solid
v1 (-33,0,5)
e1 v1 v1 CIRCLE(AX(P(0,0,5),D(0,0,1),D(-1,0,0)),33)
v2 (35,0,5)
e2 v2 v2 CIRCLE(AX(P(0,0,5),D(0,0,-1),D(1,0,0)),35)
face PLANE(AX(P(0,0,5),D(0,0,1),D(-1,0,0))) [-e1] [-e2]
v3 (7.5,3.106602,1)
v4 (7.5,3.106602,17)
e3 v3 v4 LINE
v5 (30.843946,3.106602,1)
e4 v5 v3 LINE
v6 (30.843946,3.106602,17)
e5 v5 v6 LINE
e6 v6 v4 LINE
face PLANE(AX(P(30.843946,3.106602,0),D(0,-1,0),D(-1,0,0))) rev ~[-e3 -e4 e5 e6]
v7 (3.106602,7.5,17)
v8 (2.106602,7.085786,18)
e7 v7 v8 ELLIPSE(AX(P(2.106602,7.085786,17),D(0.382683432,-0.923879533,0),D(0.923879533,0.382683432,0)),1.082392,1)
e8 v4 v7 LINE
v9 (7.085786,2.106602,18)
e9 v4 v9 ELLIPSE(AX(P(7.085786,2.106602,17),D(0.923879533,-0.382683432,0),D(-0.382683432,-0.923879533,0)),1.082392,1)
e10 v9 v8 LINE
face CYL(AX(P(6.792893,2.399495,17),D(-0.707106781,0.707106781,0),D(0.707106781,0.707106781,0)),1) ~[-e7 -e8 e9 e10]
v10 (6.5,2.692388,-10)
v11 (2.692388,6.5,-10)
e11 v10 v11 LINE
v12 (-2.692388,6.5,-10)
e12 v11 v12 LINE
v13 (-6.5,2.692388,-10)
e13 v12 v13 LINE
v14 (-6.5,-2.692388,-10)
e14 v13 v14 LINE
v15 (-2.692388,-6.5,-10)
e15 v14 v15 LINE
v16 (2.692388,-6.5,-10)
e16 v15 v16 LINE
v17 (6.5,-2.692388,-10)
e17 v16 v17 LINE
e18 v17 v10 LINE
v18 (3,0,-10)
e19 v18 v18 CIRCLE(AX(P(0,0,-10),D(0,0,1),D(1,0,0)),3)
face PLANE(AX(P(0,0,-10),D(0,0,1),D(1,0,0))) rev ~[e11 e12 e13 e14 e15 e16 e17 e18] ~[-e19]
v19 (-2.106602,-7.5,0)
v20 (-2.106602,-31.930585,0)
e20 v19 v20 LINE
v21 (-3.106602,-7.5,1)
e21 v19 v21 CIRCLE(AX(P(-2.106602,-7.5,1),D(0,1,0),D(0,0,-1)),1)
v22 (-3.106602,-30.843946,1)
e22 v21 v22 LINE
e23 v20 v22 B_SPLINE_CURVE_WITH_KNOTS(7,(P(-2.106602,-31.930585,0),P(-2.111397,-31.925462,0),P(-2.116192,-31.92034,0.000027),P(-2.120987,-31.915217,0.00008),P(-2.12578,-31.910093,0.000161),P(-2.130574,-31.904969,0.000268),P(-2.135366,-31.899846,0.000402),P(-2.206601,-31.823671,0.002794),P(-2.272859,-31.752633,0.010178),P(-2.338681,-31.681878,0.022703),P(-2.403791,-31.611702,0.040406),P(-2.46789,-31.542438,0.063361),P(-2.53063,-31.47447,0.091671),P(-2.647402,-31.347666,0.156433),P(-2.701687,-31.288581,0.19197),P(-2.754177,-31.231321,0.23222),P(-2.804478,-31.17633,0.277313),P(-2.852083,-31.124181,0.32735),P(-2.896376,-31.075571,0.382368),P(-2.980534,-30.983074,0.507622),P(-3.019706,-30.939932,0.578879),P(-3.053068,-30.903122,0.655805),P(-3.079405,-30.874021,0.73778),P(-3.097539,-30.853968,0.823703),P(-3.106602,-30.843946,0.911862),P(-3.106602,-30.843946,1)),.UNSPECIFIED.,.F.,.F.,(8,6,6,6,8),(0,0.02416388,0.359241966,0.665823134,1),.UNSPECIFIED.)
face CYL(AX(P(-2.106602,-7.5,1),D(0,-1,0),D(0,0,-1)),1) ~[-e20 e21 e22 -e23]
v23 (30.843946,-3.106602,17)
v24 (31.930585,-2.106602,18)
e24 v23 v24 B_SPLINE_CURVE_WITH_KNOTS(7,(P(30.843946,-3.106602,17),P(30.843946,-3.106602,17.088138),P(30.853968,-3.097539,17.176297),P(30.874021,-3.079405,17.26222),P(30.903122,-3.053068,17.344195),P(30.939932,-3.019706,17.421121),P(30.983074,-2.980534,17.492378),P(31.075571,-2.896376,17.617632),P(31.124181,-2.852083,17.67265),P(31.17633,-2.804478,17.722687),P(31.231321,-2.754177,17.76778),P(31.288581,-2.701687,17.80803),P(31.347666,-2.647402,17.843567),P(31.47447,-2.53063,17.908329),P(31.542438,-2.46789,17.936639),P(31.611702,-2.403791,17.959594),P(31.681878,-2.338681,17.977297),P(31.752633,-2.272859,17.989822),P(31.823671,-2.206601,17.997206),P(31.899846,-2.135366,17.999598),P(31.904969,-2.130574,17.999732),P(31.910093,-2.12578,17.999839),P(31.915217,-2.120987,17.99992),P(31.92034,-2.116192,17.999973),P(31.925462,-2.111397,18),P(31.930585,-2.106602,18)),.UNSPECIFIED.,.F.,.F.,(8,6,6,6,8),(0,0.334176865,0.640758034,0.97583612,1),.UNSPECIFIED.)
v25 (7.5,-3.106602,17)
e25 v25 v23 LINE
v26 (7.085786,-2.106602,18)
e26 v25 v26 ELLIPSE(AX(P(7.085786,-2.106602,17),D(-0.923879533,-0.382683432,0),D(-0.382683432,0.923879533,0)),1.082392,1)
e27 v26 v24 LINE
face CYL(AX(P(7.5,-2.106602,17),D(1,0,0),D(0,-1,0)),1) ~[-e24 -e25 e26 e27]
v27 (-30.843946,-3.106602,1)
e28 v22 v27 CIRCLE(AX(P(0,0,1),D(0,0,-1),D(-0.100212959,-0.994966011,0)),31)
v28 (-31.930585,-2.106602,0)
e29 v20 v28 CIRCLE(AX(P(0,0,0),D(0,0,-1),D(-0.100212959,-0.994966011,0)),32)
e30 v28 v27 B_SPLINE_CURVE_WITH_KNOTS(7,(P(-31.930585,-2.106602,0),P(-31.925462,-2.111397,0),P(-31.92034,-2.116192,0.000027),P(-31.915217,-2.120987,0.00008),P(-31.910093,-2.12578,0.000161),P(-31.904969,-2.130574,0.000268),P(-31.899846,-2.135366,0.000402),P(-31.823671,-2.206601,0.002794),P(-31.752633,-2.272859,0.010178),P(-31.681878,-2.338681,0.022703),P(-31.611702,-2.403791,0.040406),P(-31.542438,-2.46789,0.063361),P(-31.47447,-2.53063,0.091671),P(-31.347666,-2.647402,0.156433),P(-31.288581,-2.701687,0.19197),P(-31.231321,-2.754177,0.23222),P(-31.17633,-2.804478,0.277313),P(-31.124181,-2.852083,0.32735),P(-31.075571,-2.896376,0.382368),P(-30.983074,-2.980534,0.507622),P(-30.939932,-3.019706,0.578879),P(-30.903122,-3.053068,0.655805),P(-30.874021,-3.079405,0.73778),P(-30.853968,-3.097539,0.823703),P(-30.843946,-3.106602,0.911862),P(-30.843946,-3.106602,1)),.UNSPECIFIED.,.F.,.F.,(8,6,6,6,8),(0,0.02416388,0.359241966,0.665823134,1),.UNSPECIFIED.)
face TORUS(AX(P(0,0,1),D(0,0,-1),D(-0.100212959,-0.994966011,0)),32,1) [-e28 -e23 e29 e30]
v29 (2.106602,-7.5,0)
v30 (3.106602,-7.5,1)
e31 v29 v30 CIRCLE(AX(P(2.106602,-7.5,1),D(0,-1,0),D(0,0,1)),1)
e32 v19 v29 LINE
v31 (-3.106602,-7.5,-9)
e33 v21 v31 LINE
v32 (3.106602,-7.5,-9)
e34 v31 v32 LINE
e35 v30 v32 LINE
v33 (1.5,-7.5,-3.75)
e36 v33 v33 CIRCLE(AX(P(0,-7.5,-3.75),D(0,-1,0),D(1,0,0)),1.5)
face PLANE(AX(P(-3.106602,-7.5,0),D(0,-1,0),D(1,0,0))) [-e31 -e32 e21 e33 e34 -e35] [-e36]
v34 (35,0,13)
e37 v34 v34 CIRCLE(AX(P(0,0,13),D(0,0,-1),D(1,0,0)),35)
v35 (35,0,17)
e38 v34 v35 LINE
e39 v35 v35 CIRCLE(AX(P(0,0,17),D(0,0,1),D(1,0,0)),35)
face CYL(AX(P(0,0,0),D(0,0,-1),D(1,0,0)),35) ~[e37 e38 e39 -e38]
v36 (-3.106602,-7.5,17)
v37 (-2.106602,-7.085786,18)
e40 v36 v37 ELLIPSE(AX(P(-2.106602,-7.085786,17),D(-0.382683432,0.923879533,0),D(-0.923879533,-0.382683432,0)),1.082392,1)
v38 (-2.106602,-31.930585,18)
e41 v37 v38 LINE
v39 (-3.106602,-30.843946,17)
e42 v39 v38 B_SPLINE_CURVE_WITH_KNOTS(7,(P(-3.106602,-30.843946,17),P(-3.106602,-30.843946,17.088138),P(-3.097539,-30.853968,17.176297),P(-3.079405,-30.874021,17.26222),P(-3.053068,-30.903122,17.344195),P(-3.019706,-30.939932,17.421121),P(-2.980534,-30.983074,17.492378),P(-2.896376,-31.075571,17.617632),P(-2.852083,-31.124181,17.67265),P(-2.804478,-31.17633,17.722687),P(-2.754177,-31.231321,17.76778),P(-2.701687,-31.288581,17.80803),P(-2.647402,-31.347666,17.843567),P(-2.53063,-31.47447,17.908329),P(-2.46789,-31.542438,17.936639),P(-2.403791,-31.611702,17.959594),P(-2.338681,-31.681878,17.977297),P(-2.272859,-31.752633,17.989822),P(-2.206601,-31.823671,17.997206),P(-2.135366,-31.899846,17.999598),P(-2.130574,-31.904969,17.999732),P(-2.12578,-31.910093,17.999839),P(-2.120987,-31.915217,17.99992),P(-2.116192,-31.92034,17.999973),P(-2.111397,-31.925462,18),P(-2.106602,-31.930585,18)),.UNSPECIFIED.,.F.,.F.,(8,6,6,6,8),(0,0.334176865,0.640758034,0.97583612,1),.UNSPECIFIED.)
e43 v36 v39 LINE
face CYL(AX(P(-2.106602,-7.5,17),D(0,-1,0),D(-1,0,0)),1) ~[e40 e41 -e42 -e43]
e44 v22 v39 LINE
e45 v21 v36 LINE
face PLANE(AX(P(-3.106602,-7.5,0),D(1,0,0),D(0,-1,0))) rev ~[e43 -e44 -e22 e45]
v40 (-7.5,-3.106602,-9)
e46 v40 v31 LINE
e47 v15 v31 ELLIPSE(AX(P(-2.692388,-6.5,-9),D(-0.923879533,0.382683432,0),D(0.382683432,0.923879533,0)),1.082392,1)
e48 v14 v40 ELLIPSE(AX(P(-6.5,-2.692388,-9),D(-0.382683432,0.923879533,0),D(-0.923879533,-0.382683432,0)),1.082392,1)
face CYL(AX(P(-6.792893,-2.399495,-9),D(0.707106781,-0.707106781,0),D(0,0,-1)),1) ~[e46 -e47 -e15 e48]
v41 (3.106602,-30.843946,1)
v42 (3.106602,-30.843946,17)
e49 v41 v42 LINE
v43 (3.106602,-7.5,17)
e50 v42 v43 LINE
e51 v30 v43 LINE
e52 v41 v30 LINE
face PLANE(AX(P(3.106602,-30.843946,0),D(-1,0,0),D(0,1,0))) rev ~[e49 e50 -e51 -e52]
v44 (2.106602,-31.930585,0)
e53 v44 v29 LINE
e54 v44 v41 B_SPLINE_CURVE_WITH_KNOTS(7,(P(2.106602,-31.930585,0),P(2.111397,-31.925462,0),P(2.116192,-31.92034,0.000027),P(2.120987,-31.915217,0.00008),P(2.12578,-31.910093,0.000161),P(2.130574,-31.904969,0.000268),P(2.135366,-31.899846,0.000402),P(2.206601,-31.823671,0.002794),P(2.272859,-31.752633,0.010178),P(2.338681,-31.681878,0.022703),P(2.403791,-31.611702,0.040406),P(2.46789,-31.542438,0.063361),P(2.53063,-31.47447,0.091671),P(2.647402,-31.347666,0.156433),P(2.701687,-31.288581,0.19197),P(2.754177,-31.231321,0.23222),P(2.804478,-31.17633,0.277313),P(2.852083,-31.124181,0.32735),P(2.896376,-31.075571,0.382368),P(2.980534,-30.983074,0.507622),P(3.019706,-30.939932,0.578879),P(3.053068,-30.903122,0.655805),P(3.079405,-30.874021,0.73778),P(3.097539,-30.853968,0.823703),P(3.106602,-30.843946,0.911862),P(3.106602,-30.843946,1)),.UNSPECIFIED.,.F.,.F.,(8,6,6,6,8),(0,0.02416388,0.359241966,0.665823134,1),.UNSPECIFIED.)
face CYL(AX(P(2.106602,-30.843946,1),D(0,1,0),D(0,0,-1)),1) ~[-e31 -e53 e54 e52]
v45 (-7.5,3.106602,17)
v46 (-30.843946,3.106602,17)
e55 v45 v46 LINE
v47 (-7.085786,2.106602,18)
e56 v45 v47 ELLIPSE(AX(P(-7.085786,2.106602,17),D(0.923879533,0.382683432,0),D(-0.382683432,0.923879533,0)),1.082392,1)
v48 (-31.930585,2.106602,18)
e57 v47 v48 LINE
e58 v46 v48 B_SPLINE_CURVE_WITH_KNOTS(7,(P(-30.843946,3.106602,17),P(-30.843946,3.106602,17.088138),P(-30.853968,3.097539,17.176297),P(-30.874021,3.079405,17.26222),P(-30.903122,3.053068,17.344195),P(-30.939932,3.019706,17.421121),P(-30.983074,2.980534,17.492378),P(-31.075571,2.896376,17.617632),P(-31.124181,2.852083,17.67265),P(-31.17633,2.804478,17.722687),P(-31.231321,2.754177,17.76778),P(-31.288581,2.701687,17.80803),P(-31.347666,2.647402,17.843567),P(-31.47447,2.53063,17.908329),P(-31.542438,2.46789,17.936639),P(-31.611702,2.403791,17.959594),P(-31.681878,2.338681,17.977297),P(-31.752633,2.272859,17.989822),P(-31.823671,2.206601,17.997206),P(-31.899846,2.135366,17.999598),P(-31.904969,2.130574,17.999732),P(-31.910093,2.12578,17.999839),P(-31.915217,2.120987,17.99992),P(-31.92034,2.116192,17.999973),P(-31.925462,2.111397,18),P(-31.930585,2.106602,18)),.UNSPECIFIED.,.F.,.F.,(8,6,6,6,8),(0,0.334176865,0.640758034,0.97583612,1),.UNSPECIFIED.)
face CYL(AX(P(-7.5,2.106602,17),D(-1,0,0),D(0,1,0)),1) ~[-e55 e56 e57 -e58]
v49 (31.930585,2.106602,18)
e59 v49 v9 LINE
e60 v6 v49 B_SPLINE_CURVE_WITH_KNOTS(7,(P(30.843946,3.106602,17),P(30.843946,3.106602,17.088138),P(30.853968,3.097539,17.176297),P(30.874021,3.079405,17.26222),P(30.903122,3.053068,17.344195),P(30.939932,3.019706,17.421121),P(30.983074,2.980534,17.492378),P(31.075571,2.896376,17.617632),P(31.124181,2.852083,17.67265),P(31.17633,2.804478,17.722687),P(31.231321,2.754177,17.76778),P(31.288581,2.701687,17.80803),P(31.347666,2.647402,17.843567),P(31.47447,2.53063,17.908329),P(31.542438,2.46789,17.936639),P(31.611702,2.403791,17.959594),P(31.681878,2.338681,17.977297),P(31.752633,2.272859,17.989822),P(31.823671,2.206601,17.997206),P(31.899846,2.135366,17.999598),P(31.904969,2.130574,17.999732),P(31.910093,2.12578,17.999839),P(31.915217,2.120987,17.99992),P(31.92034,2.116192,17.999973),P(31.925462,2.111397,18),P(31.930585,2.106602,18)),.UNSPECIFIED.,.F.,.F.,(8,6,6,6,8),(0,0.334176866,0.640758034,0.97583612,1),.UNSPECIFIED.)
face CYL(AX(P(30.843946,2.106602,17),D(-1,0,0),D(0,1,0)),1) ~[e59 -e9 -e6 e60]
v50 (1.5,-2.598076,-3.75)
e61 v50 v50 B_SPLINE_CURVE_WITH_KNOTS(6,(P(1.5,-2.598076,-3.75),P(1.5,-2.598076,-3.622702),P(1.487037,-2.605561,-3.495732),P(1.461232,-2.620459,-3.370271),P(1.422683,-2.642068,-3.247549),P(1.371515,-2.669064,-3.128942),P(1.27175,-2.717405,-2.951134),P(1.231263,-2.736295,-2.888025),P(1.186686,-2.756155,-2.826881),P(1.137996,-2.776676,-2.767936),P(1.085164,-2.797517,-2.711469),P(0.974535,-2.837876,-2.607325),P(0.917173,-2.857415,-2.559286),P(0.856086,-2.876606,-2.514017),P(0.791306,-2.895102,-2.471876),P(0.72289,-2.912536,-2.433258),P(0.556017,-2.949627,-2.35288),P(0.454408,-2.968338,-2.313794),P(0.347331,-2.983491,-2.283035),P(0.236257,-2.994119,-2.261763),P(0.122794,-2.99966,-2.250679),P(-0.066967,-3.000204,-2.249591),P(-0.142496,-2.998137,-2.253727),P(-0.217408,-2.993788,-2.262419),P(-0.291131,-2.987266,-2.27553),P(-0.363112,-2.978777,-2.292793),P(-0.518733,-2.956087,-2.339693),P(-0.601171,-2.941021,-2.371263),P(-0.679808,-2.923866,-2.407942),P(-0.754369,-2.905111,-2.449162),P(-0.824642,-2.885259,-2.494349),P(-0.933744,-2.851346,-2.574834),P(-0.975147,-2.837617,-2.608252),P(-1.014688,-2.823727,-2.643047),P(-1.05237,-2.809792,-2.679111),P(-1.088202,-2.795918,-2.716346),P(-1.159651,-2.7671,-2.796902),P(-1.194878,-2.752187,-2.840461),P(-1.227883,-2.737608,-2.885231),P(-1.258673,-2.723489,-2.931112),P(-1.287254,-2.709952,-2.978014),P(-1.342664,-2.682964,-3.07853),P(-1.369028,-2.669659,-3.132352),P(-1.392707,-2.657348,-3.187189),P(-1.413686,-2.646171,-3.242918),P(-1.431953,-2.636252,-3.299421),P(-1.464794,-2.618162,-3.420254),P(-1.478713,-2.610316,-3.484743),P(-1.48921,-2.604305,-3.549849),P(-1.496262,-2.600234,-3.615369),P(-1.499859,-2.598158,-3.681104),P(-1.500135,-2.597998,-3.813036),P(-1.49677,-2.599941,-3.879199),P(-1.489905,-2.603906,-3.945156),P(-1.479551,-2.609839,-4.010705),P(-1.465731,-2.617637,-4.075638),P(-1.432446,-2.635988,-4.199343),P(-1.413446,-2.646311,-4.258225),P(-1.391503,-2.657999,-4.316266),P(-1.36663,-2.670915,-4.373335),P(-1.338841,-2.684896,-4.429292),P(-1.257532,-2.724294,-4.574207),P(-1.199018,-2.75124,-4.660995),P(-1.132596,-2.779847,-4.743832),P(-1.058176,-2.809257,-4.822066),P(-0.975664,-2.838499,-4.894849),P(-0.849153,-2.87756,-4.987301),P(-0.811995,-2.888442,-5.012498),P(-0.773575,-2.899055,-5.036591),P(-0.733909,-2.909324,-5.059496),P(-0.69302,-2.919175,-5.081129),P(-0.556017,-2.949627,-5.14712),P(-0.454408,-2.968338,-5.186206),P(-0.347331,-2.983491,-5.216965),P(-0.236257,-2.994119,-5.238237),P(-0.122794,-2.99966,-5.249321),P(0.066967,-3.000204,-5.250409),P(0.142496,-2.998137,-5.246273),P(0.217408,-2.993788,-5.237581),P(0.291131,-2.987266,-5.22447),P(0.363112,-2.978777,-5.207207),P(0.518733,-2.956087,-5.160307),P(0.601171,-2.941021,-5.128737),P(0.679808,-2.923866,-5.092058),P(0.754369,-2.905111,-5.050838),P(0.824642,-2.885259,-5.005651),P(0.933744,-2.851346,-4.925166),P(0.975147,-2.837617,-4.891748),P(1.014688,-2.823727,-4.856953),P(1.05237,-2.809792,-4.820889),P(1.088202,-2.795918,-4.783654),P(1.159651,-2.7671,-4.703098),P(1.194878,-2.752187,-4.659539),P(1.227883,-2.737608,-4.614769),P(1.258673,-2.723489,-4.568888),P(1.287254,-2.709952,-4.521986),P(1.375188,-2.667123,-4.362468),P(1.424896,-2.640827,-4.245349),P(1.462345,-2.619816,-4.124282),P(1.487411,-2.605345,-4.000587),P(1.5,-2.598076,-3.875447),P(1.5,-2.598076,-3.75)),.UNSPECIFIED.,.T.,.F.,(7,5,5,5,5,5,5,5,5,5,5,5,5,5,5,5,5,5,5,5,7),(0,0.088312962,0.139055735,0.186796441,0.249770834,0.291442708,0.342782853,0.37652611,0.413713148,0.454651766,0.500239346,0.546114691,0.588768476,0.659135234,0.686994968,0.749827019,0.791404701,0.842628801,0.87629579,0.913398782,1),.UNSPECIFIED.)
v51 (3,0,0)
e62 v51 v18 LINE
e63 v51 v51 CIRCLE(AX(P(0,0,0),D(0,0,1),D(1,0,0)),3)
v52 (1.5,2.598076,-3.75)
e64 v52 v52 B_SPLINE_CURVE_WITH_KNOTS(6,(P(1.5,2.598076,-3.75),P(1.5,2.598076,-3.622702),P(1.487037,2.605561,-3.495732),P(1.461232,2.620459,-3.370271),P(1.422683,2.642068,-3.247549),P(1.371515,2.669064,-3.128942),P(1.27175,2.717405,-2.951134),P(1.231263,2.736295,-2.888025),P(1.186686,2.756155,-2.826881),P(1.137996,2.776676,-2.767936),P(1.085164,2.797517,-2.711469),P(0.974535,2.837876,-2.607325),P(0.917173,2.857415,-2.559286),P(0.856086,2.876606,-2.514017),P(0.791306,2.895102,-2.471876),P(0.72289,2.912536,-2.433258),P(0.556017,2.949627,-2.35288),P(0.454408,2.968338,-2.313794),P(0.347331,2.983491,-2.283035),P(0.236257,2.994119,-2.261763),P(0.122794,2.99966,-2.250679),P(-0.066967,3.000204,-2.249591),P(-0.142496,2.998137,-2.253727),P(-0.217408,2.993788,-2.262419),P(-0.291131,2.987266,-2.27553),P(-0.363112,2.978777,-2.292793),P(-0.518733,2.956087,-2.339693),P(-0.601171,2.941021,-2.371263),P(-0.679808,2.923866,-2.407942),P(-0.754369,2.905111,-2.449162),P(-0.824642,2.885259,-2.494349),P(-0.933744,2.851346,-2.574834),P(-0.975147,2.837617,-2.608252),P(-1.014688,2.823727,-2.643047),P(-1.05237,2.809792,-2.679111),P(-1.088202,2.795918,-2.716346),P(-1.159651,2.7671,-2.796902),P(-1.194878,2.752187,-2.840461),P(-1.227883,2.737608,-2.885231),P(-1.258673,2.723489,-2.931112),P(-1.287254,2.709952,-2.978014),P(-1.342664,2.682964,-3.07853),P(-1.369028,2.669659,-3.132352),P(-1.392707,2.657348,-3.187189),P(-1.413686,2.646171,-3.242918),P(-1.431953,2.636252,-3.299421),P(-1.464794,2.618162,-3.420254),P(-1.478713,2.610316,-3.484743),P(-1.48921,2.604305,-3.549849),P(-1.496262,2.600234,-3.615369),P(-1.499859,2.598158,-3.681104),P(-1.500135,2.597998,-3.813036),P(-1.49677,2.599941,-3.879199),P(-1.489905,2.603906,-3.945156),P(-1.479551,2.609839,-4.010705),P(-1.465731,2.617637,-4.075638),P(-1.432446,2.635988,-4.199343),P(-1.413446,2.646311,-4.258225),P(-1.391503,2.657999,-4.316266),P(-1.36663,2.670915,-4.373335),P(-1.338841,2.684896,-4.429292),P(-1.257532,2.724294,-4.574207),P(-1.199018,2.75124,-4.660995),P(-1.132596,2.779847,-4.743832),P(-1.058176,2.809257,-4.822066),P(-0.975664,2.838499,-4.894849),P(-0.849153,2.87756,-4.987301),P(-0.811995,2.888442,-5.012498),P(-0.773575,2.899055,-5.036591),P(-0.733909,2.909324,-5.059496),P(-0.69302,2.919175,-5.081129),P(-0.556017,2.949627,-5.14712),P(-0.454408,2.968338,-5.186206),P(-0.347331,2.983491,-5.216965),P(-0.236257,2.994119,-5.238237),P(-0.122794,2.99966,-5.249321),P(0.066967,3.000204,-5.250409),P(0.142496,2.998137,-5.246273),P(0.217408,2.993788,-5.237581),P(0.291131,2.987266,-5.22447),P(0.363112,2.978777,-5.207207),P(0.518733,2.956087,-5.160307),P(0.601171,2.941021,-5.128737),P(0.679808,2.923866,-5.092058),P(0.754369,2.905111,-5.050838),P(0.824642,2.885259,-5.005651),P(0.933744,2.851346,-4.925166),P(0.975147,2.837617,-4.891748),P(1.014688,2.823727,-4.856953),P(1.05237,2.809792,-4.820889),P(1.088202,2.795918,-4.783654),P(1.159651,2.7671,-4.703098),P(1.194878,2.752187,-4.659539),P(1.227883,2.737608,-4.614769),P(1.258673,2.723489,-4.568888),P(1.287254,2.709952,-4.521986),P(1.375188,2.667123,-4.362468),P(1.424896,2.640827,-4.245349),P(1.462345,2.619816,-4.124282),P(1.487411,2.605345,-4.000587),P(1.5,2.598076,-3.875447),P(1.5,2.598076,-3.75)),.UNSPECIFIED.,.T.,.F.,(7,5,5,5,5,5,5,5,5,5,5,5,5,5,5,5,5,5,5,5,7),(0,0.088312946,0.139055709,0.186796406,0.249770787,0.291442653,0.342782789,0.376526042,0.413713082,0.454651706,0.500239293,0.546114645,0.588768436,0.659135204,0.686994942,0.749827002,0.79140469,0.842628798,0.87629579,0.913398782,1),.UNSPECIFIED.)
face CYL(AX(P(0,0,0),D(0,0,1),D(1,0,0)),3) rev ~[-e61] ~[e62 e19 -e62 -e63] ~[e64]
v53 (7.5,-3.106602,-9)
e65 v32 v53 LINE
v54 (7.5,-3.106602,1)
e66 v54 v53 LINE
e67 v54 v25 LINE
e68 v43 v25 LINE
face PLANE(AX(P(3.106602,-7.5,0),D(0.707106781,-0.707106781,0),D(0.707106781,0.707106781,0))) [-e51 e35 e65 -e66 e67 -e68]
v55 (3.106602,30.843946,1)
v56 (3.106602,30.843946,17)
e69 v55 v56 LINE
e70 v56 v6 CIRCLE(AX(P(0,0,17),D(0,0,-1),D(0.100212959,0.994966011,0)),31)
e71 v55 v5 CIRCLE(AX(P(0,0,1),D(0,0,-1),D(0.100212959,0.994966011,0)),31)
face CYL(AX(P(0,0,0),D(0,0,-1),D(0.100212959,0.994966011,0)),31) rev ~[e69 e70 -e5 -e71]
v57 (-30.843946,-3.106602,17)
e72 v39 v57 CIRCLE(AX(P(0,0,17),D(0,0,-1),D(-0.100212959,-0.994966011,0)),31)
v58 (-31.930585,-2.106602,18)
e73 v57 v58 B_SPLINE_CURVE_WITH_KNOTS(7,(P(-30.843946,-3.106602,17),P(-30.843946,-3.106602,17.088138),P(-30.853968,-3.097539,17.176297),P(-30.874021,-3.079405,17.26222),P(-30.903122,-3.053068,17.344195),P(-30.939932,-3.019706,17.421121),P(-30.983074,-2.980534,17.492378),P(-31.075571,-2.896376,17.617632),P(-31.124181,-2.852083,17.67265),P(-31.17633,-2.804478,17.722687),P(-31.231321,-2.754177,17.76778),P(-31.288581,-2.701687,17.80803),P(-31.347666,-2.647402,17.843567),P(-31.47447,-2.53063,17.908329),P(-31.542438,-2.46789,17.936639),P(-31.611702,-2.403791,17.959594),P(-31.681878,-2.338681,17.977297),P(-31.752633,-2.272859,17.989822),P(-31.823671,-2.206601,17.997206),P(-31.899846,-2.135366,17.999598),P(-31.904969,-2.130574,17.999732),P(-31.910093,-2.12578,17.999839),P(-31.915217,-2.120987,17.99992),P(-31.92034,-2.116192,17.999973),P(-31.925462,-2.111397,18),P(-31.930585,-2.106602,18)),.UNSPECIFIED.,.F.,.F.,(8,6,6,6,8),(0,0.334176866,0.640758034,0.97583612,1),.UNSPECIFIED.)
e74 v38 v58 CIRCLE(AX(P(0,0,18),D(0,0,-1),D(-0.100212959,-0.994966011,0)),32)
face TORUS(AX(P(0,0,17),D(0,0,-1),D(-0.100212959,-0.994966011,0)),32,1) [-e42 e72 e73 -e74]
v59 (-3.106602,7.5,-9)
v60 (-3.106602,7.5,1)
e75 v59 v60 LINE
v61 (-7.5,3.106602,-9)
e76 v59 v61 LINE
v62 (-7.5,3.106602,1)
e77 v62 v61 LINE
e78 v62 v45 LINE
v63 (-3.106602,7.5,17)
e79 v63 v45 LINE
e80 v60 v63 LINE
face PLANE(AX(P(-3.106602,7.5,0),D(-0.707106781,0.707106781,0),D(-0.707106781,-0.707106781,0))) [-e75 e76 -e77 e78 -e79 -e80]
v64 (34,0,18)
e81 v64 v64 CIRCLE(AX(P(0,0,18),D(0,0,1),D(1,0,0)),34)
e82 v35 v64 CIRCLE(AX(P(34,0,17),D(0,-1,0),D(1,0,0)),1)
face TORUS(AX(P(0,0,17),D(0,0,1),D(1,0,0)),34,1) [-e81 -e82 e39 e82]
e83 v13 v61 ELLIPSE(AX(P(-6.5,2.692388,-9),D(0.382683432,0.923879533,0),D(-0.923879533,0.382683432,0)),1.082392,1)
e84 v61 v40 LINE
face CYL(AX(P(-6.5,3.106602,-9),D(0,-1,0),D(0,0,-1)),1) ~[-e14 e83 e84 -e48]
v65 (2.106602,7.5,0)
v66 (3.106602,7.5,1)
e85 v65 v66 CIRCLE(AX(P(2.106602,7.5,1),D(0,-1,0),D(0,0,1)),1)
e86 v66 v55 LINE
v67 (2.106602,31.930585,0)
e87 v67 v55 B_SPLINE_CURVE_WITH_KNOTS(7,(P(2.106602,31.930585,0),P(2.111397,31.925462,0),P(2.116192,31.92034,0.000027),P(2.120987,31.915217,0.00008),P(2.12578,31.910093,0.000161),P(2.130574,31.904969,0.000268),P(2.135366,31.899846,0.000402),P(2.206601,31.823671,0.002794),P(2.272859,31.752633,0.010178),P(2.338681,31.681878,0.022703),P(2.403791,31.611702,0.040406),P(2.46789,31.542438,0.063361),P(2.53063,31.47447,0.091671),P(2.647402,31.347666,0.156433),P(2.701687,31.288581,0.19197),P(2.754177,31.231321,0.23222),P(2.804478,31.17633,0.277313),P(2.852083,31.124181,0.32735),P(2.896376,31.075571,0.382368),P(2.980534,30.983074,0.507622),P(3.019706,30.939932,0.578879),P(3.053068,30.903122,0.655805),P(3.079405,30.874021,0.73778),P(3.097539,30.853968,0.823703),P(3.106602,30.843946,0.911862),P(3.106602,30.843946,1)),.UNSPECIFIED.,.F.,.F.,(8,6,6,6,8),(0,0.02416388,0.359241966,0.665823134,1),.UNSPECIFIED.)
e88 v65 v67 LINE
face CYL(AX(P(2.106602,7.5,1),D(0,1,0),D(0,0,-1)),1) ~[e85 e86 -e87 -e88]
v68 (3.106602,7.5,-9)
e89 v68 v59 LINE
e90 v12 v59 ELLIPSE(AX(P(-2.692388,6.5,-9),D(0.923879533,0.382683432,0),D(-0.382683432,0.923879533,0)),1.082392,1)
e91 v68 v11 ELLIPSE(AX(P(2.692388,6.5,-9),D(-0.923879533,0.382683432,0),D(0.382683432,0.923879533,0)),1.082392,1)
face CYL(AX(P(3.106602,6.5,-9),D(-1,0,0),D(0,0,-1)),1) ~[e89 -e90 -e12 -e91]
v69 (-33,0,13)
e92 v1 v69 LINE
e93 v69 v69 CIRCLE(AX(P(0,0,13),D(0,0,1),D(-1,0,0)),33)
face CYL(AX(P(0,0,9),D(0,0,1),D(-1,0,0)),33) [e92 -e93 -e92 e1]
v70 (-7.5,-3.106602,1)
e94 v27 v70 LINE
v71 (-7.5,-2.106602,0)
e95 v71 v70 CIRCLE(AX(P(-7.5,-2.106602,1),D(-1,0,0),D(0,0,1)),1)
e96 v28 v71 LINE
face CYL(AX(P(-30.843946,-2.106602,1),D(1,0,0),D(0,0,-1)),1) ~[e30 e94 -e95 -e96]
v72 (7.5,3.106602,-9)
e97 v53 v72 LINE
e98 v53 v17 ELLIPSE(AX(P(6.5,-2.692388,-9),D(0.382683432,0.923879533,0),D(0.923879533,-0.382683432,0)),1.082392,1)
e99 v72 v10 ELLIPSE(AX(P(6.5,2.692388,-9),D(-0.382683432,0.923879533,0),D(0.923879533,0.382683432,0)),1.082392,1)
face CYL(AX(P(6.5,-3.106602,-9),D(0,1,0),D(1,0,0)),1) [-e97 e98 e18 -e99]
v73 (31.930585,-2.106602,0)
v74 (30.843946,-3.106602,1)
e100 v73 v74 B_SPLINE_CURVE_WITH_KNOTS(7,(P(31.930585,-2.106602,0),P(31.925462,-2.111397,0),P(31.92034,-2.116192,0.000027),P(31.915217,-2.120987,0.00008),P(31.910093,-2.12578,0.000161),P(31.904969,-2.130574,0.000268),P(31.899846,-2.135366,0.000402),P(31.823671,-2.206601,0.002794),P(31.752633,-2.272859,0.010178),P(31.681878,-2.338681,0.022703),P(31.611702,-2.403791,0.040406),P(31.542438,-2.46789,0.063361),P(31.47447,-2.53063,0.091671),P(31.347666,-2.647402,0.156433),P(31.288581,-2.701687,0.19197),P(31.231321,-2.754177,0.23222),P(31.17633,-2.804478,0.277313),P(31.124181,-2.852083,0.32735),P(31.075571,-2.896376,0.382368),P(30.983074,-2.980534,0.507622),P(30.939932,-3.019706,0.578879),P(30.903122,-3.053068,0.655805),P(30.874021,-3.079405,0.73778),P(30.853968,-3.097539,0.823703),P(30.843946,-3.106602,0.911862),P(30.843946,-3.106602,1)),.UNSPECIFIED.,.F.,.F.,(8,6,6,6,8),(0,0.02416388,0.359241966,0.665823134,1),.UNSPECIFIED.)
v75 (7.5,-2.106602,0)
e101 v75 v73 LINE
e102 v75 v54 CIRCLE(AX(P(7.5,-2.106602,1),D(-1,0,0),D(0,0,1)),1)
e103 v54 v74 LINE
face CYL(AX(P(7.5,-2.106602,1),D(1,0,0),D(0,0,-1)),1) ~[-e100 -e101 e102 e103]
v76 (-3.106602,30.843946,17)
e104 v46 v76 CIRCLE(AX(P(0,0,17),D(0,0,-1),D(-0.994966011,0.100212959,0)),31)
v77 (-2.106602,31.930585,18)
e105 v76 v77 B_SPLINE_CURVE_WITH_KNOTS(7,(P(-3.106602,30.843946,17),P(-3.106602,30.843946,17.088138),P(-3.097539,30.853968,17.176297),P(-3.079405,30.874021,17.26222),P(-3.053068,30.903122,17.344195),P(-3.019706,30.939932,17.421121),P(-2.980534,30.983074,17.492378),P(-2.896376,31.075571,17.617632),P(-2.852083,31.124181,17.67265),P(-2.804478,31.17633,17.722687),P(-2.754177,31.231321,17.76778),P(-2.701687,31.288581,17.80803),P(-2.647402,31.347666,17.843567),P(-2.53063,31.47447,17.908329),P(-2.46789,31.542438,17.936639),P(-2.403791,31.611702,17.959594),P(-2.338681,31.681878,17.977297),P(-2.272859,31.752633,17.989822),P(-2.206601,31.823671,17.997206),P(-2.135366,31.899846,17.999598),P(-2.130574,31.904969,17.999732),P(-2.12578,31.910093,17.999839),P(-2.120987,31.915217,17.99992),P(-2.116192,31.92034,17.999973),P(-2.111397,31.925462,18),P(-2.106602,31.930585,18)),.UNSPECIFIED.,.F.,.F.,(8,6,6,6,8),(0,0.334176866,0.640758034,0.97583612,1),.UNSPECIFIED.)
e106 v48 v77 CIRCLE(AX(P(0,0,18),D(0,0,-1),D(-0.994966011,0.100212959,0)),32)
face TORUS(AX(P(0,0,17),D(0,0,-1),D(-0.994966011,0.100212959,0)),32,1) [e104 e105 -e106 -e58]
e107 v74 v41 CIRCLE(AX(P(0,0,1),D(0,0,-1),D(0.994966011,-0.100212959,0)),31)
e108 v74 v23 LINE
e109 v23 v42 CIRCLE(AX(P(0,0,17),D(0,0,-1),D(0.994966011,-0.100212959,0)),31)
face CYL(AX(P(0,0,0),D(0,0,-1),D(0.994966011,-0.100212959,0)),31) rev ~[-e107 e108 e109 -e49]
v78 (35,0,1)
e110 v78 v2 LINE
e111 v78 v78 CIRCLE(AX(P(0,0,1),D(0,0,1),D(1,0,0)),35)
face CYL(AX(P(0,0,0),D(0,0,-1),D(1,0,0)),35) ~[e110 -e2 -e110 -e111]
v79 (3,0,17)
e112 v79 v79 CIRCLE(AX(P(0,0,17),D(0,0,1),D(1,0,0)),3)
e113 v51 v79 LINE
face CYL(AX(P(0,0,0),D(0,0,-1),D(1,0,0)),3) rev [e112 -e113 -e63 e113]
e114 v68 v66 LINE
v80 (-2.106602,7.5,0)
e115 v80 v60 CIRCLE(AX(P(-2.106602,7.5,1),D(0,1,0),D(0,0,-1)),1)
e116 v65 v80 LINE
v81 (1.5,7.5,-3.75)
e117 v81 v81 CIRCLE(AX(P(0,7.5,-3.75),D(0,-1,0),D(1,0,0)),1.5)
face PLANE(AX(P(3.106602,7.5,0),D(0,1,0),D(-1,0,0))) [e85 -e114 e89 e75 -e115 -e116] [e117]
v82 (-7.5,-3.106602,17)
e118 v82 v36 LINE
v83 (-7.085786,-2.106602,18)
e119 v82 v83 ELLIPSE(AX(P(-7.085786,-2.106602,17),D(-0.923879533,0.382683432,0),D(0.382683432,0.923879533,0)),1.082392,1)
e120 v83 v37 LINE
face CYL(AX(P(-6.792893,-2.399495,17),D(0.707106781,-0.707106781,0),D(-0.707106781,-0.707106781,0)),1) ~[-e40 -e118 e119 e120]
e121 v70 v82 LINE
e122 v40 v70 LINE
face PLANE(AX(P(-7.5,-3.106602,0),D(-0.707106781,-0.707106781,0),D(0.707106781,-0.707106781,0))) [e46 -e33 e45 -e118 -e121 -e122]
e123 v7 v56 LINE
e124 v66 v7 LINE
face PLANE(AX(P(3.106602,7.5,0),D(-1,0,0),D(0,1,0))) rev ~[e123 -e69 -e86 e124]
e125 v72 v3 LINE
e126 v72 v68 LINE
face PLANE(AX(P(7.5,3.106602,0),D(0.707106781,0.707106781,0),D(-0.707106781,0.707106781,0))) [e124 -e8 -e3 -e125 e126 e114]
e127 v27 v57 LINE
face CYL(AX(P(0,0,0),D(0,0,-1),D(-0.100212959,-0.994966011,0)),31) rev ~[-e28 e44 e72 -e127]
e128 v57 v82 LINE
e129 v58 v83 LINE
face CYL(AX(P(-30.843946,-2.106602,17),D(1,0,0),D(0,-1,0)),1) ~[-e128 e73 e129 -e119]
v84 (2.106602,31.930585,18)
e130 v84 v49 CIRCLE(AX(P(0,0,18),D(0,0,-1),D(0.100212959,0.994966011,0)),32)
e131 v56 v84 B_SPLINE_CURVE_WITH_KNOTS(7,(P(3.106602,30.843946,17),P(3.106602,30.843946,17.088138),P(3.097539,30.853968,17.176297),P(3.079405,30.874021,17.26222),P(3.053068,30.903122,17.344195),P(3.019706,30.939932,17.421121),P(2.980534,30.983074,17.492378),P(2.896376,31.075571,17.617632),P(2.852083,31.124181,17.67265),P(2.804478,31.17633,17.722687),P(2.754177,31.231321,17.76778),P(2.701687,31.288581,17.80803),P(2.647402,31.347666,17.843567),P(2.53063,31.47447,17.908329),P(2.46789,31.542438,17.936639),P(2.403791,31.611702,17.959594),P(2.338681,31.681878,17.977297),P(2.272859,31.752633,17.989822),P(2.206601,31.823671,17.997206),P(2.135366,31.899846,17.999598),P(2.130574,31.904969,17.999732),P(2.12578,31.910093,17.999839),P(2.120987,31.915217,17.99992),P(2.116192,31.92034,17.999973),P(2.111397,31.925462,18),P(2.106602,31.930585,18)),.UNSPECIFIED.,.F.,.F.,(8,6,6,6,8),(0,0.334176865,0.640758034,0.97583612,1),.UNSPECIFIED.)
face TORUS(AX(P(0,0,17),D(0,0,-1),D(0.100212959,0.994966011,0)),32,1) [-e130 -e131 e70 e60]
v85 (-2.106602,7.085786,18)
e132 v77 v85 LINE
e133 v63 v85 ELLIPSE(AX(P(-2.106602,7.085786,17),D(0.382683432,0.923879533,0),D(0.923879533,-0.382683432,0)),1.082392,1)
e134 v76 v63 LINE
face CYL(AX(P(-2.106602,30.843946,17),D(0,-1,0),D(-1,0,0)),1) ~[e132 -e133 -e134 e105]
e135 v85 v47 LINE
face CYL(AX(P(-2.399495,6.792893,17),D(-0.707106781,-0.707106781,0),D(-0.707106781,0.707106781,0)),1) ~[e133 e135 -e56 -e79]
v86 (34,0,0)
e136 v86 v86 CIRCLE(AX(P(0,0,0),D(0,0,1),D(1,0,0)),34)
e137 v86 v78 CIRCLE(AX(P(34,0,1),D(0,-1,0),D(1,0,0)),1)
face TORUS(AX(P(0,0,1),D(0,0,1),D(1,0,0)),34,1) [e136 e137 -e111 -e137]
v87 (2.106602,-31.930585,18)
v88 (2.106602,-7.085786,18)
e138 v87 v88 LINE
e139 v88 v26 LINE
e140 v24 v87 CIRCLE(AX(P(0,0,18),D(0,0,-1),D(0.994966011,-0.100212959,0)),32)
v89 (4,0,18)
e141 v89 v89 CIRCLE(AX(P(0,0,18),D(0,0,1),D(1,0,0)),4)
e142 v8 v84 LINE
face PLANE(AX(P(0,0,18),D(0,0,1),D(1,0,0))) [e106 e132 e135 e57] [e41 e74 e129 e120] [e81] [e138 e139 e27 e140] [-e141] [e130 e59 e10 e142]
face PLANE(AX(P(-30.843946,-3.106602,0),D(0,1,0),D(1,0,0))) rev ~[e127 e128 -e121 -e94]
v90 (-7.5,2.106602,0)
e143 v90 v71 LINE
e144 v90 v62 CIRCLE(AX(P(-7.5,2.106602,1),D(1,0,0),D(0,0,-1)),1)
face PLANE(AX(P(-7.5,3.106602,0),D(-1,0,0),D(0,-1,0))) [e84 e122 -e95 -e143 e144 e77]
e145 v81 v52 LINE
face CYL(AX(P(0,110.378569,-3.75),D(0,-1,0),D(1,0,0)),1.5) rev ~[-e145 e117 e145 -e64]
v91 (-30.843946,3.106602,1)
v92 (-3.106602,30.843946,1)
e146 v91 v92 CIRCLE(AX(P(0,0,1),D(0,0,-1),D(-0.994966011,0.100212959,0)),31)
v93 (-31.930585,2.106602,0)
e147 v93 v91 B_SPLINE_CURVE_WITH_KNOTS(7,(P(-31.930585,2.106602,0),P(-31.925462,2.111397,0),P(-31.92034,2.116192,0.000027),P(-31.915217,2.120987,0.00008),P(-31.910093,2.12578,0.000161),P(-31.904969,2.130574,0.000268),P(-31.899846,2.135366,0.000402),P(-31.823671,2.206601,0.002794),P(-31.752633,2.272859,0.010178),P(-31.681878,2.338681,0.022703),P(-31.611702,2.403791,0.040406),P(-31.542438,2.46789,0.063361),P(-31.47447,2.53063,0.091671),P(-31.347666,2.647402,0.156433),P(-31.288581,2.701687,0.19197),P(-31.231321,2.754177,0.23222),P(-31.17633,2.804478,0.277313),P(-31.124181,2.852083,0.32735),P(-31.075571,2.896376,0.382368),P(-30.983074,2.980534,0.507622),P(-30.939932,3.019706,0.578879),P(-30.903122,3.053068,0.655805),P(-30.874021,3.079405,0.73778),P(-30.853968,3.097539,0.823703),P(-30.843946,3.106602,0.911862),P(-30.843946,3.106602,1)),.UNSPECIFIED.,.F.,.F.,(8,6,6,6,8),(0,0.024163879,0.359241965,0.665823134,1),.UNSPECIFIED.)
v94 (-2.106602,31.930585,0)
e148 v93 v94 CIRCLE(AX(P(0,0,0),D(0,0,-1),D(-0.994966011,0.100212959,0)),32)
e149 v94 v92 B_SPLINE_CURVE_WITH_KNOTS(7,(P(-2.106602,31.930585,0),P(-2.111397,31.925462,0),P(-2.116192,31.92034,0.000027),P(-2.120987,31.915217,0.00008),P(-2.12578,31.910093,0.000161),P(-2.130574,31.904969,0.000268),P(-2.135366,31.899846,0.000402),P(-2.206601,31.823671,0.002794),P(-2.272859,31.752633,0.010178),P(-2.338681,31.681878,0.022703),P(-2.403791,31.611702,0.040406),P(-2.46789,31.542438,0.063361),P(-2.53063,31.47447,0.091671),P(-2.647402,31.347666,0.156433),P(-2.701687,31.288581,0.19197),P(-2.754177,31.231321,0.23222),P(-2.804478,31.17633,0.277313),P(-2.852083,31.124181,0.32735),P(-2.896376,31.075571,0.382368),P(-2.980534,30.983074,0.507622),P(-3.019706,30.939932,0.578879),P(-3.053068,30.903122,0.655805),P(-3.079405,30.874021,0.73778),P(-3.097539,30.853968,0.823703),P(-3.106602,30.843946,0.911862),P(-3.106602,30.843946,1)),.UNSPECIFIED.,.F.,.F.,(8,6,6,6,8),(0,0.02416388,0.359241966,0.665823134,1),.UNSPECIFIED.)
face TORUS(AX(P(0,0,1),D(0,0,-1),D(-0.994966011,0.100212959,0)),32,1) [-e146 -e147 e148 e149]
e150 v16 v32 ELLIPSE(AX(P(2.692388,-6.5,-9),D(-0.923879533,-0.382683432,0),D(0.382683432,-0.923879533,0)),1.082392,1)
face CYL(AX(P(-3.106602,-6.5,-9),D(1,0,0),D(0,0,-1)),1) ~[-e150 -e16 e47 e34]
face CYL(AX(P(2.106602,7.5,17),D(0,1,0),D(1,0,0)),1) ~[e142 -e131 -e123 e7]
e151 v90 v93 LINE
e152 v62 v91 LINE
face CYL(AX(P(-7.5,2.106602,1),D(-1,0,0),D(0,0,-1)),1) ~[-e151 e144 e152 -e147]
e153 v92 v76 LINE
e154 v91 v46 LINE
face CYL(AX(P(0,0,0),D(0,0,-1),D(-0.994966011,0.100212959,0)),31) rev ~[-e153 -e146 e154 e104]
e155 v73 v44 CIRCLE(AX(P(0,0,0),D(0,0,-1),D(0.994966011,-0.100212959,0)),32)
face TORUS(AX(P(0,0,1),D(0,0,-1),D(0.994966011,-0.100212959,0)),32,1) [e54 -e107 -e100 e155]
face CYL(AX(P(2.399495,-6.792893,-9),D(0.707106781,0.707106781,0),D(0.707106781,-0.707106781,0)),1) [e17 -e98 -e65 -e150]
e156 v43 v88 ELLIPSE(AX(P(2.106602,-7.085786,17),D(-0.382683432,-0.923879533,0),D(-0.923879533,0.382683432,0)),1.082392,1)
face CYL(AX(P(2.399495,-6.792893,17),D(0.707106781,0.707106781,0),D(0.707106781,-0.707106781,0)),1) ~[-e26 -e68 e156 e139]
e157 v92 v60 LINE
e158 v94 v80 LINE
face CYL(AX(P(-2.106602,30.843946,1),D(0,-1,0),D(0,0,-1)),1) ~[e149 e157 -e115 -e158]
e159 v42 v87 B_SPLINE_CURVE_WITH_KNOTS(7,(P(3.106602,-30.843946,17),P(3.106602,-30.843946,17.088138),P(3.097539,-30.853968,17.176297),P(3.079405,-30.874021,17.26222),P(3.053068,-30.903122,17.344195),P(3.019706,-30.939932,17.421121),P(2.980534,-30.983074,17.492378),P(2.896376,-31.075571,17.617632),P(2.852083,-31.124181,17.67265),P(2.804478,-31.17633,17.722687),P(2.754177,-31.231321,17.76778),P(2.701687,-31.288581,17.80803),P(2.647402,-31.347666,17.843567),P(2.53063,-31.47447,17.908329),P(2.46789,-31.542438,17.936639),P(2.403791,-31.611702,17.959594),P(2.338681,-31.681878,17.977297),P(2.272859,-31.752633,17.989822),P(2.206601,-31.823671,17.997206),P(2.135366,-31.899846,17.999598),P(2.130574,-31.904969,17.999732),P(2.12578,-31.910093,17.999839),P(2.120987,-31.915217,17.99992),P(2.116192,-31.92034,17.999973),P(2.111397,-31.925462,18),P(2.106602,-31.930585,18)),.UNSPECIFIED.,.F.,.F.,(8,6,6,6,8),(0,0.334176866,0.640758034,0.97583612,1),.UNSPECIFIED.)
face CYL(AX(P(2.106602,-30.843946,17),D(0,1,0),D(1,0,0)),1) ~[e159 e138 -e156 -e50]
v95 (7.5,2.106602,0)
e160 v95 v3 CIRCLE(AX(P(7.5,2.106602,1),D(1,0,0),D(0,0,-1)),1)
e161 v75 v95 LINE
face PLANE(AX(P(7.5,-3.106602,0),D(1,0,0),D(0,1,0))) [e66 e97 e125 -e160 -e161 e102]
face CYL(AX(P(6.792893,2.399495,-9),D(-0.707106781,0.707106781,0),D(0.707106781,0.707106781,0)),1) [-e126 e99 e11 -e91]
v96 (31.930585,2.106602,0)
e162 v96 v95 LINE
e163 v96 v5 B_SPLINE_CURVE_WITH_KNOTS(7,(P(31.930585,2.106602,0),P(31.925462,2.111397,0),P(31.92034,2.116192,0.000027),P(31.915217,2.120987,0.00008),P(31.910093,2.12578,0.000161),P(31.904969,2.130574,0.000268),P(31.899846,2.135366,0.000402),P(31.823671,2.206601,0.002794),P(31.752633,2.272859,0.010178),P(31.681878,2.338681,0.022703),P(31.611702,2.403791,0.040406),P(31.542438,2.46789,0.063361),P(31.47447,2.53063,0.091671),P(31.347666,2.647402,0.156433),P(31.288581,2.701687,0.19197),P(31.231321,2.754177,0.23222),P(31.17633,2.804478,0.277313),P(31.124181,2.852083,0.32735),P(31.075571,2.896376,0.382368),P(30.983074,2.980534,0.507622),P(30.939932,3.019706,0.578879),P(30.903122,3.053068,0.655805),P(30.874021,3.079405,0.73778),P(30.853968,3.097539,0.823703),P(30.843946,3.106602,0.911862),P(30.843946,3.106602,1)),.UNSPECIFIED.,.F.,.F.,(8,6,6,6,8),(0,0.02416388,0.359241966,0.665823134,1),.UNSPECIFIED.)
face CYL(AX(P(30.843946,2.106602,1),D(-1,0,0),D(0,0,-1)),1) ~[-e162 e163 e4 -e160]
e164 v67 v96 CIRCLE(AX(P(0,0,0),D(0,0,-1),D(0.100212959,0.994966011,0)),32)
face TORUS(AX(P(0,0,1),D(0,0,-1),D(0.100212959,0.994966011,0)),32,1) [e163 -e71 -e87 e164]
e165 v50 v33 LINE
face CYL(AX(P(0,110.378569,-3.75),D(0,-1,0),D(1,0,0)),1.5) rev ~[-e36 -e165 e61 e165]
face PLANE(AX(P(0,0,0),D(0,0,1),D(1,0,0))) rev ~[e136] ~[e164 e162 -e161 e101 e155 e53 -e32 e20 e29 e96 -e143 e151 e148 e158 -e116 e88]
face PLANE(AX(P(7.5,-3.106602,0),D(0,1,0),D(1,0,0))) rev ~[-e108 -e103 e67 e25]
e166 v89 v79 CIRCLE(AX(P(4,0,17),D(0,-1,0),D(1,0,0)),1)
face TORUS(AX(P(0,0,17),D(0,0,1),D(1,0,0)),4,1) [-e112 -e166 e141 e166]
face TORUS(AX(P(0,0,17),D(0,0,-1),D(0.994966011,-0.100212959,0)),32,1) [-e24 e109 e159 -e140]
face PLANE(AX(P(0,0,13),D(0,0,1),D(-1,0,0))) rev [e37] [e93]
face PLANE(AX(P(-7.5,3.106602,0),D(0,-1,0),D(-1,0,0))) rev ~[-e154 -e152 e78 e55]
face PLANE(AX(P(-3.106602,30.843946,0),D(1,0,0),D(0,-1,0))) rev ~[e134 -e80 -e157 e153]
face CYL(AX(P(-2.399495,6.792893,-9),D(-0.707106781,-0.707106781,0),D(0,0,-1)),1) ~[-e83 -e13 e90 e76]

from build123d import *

# Parameters (mm, degrees)
F0_R     = 35
F0_R_2   = 3
F1_DEPTH = 18
F2_DEPTH = 10
F3_R     = 1
F5_D     = 3
F6_W     = 5.9583846331
F6_H     = 8
F6_W_2   = 2.0416153669


# Not quite as in the source:
# - a feature names something its author has since deleted; it is built from what else it names


with BuildPart() as f1:
    # F0 (on Top) → F1 (new body)
    with BuildSketch(Plane.XY):
        Circle(F0_R)
        with BuildLine():
            ThreePointArc((30.8439463391, 3.1066017178), (30.9609620047, 1.5552593818), (31, 0))
            ThreePointArc((31, 0), (30.9609620047, -1.5552593818), (30.8439463391, -3.1066017178))
            ThreePointArc((30.8439463391, -3.1066017178), (21.9203102168, -21.9203102168), (3.1066017178, -30.8439463391))
            ThreePointArc((3.1066017178, -30.8439463391), (0, -31), (-3.1066017178, -30.8439463391))
            ThreePointArc((-3.1066017178, -30.8439463391), (-21.9203102168, -21.9203102168), (-30.8439463391, -3.1066017178))
            ThreePointArc((-30.8439463391, -3.1066017178), (-31, 0), (-30.8439463391, 3.1066017178))
            ThreePointArc((-30.8439463391, 3.1066017178), (-21.9203102168, 21.9203102168), (-3.1066017178, 30.8439463391))
            ThreePointArc((-3.1066017178, 30.8439463391), (0, 31), (3.1066017178, 30.8439463391))
            ThreePointArc((3.1066017178, 30.8439463391), (21.9203102168, 21.9203102168), (30.8439463391, 3.1066017178))
        make_face(mode=Mode.SUBTRACT)
        with BuildLine():
            ThreePointArc((30.8439463391, -3.1066017178), (30.9609620047, -1.5552593818), (31, 0))
            ThreePointArc((31, 0), (30.9609620047, 1.5552593818), (30.8439463391, 3.1066017178))
            Line((30.8439463391, 3.1066017178), (7.5, 3.1066017178))
            Line((7.5, 3.1066017178), (7.5, -3.1066017178))
            Line((7.5, -3.1066017178), (30.8439463391, -3.1066017178))
        make_face()
        with BuildLine():
            Line((3.1066017178, 7.5), (3.1066017178, 30.8439463391))
            ThreePointArc((3.1066017178, 30.8439463391), (0, 31), (-3.1066017178, 30.8439463391))
            Line((-3.1066017178, 30.8439463391), (-3.1066017178, 7.5))
            Line((-3.1066017178, 7.5), (3.1066017178, 7.5))
        make_face()
        with BuildLine():
            Line((-7.5, 3.1066017178), (-30.8439463391, 3.1066017178))
            ThreePointArc((-30.8439463391, 3.1066017178), (-31, 0), (-30.8439463391, -3.1066017178))
            Line((-30.8439463391, -3.1066017178), (-7.5, -3.1066017178))
            Line((-7.5, -3.1066017178), (-7.5, 3.1066017178))
        make_face()
        with BuildLine():
            ThreePointArc((-3.1066017178, -30.8439463391), (0, -31), (3.1066017178, -30.8439463391))
            Line((3.1066017178, -30.8439463391), (3.1066017178, -7.5))
            Line((3.1066017178, -7.5), (-3.1066017178, -7.5))
            Line((-3.1066017178, -7.5), (-3.1066017178, -30.8439463391))
        make_face()
        Polygon((7.5, -3.1066017178), (7.5, 3.1066017178), (3.1066017178, 7.5), (-3.1066017178, 7.5), (-7.5, 3.1066017178), (-7.5, -3.1066017178), (-3.1066017178, -7.5), (3.1066017178, -7.5), align=None)
        Circle(F0_R_2, mode=Mode.SUBTRACT)
    extrude(amount=F1_DEPTH)

    # F0 (on Top) → F2 (join)
    with BuildSketch(Plane.XY):
        Polygon((7.5, -3.1066017178), (7.5, 3.1066017178), (3.1066017178, 7.5), (-3.1066017178, 7.5), (-7.5, 3.1066017178), (-7.5, -3.1066017178), (-3.1066017178, -7.5), (3.1066017178, -7.5), align=None)
        Circle(F0_R_2, mode=Mode.SUBTRACT)
    extrude(amount=-F2_DEPTH)

    # F3
    f3_edges = [f1.edges().sort_by_distance(p)[0] for p in [
        (-35, 0, 18),
        (21.92031, -21.92031, 18),
        (3.106602, -19.171973, 18),
        (5.303301, -5.303301, 18),
        (19.171973, -3.106602, 18),
        (-3.106602, -19.171973, 18),
        (-21.92031, -21.92031, 18),
        (-19.171973, -3.106602, 18),
        (-5.303301, -5.303301, 18),
        (-19.171973, 3.106602, 18),
        (-21.92031, 21.92031, 18),
        (-3.106602, 19.171973, 18),
        (-5.303301, 5.303301, 18),
        (3.106602, 19.171973, 18),
        (21.92031, 21.92031, 18),
        (19.171973, 3.106602, 18),
        (5.303301, 5.303301, 18),
        (-3, 0, 18),
        (0, -7.5, -10),
        (5.303301, -5.303301, -10),
        (7.5, 0, -10),
        (5.303301, 5.303301, -10),
        (0, 7.5, -10),
        (-5.303301, 5.303301, -10),
        (-7.5, 0, -10),
        (-5.303301, -5.303301, -10),
        (-35, 0, 0),
        (-3.106602, 19.171973, 0),
        (3.106602, 19.171973, 0),
        (19.171973, 3.106602, 0),
        (19.171973, -3.106602, 0),
        (3.106602, -19.171973, 0),
        (-3.106602, -19.171973, 0),
        (-19.171973, -3.106602, 0),
        (21.92031, 21.92031, 0),
        (21.92031, -21.92031, 0),
        (-21.92031, -21.92031, 0),
        (-21.92031, 21.92031, 0),
        (-19.171973, 3.106602, 0),
    ]]
    fillet(f3_edges, radius=F3_R)

    # F5 (through all)
    with Locations(Plane(origin=(0, 7.5, 0), x_dir=(-1, 0, 0), z_dir=(0, 1, 0))):
        with Locations((0, -3.75)):
            Hole(F5_D / 2)

    # F6 (on Front) → F7 (revolve, cut)
    with BuildSketch(Plane.XZ):
        with Locations((-38.0208076835, 9)):
            Rectangle(F6_W, F6_H)
        with Locations((-34.0208076835, 9)):
            Rectangle(F6_W_2, F6_H)
    revolve(axis=Axis((0, 0, 17), (0, 0, 1)), mode=Mode.SUBTRACT)


solid = f1.part
